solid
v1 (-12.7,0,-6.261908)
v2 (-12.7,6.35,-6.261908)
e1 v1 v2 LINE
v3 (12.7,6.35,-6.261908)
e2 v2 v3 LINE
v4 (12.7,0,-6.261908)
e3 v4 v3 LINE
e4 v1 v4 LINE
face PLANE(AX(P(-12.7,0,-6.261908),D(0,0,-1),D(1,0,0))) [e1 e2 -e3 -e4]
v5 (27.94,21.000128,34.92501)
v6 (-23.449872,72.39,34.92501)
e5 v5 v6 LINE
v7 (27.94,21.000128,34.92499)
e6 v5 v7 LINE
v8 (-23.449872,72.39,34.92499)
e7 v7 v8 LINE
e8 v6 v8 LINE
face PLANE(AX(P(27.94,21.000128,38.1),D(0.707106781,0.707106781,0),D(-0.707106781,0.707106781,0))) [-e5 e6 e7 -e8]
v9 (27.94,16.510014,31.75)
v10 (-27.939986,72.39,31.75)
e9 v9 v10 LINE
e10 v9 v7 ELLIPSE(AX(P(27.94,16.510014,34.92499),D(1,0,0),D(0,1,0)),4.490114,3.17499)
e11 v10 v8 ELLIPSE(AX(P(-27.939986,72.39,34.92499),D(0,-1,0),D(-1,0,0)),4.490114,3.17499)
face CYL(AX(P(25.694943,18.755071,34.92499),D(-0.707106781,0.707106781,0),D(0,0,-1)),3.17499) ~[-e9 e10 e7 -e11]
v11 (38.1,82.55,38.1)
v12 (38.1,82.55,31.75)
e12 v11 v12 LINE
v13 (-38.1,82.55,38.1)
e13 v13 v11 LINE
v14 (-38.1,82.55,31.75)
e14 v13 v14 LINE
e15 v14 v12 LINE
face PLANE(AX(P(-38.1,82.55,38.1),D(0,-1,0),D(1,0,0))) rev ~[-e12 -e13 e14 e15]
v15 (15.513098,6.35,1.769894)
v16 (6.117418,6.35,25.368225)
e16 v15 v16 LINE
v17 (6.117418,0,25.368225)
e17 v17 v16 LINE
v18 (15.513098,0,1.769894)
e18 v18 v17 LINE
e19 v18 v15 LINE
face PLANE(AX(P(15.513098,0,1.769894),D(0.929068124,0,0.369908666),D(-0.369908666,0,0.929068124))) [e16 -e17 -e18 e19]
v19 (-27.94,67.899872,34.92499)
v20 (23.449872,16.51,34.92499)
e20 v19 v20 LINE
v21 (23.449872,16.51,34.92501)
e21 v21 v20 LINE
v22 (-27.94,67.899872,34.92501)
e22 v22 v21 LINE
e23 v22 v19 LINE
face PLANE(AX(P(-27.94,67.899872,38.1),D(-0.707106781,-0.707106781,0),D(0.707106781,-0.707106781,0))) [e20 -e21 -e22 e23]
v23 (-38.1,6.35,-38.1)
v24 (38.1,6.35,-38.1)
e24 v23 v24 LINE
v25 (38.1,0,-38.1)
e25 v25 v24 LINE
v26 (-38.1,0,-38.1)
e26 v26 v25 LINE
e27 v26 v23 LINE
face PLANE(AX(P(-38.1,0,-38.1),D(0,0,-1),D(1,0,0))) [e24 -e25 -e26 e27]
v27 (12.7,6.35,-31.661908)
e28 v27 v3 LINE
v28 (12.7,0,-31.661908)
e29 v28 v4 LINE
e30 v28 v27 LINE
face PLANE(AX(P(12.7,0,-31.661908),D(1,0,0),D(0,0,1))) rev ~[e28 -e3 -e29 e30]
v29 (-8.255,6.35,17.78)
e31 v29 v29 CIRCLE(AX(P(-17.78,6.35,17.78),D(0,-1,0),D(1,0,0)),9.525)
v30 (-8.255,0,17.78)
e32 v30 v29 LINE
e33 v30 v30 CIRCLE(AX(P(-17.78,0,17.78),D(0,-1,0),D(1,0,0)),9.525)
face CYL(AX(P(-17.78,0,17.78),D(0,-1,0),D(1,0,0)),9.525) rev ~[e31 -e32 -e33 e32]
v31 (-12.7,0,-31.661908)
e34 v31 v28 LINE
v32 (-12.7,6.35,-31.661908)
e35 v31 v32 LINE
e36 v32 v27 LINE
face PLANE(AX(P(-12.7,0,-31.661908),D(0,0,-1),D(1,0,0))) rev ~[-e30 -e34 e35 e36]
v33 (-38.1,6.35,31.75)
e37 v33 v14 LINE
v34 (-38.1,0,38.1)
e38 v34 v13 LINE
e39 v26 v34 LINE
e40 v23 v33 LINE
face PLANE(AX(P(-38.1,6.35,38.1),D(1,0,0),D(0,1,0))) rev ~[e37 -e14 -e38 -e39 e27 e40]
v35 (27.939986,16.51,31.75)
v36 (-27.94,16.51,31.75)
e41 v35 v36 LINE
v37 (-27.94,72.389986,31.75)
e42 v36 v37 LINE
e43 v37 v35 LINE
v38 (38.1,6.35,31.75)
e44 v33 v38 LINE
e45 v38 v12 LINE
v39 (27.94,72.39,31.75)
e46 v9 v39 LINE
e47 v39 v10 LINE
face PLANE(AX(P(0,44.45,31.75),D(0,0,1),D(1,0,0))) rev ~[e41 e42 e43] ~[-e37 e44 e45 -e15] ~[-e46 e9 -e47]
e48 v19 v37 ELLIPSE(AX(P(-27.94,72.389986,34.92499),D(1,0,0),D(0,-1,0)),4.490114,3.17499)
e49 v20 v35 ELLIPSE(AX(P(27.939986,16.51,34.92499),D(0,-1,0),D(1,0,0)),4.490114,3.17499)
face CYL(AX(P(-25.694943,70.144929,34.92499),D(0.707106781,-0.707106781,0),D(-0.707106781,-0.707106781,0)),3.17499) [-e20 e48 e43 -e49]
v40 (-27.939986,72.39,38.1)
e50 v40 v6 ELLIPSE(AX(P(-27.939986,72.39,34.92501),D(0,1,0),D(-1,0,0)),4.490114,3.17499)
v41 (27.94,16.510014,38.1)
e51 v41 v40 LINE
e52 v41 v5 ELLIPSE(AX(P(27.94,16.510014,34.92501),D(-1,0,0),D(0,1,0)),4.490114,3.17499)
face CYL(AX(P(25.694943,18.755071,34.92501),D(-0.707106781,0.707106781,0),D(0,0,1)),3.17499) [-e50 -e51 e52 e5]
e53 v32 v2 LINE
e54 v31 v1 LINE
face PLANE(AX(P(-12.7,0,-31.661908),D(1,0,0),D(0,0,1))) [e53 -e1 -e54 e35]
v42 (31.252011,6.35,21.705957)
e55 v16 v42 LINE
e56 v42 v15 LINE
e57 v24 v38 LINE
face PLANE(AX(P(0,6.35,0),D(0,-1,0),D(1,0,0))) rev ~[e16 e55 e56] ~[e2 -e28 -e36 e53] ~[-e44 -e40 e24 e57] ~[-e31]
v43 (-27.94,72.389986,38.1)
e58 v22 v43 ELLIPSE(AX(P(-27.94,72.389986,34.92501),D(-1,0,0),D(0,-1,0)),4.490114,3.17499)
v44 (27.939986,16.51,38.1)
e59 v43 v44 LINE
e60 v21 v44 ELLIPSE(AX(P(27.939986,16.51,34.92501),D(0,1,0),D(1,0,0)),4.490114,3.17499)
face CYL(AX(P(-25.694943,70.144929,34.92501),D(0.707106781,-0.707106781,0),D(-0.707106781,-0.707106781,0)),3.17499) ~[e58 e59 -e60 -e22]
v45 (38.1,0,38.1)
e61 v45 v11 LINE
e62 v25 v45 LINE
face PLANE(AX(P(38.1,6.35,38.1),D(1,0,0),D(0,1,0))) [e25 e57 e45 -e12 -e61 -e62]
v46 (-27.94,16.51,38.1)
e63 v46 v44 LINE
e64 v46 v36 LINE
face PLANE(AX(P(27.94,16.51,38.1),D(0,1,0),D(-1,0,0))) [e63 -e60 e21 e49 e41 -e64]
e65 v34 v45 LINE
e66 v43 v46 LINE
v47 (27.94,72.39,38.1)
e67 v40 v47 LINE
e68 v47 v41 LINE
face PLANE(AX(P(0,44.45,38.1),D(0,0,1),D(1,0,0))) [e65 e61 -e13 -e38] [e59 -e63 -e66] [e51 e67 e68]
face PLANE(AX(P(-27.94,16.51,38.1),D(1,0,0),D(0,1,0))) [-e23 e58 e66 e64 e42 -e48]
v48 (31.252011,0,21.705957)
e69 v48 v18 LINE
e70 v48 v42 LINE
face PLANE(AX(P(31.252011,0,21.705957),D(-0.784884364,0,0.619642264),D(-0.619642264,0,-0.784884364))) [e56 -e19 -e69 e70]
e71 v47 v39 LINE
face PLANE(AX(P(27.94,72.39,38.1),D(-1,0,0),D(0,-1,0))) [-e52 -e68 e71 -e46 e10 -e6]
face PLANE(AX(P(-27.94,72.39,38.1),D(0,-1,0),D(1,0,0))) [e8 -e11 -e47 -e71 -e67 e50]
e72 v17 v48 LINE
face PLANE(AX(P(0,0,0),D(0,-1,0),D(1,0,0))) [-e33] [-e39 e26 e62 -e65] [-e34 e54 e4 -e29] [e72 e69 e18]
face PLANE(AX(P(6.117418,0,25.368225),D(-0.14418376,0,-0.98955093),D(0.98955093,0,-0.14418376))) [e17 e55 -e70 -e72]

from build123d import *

# Parameters (mm, degrees)
F0_W     = 76.2
F0_H     = 76.2
F0_W_2   = 25.4
F0_H_2   = 25.4
F0_R     = 9.525
F1_DEPTH = 6.35
F2_W     = 76.2
F2_H     = 76.2
F3_DEPTH = 6.35
F4_DEPTH = 6.35
F5_R     = 3.17499


# Not quite as in the source:
# - a fillet or chamfer is up to 0.001 mm smaller than in the source, because OpenCascade refuses the exact size


with BuildPart() as f1:
    # F0 (on Front) → F1 (new body)
    with BuildSketch(Plane.XZ):
        Rectangle(F0_W, F0_H)
        with Locations((0, -18.9619082958)):
            Rectangle(F0_W_2, F0_H_2, mode=Mode.SUBTRACT)
        with Locations((-17.78, 17.78)):
            Circle(F0_R, mode=Mode.SUBTRACT)
        Polygon((15.5130978999, 1.7698944463), (6.1174177746, 25.3682247894), (31.2520114013, 21.7059572922), align=None, mode=Mode.SUBTRACT)
    extrude(amount=-F1_DEPTH)

    # F2 (on face) → F3 (join)
    with BuildSketch(Plane.XY.offset(38.1)):
        with Locations((0, 44.45)):
            Rectangle(F2_W, F2_H)
        Polygon((-27.94, 67.8998719395), (-27.94, 72.39), (-23.4498719395, 72.39), (27.94, 72.39), (27.94, 21.0001280605), (27.94, 16.51), (23.4498719395, 16.51), (-27.94, 16.51), align=None, mode=Mode.SUBTRACT)
    extrude(amount=-F3_DEPTH)

    # F2 (on face) → F4 (join)
    with BuildSketch(Plane.XY.offset(38.1)):
        Polygon((-23.4498719395, 72.39), (-27.94, 72.39), (-27.94, 67.8998719395), (23.4498719395, 16.51), (27.94, 16.51), (27.94, 21.0001280605), align=None)
    extrude(amount=-F4_DEPTH)

    # F5 (radius 3.175 in the source; OpenCascade refuses exactly that, so slightly less here)
    f5_edges = [f1.edges().sort_by_distance(p)[0] for p in [
        (2.245064, 46.695064, 38.1),
        (-2.245064, 42.204936, 38.1),
        (-2.245064, 42.204936, 31.75),
        (2.245064, 46.695064, 31.75),
    ]]
    fillet(f5_edges, radius=F5_R)


solid = f1.part
